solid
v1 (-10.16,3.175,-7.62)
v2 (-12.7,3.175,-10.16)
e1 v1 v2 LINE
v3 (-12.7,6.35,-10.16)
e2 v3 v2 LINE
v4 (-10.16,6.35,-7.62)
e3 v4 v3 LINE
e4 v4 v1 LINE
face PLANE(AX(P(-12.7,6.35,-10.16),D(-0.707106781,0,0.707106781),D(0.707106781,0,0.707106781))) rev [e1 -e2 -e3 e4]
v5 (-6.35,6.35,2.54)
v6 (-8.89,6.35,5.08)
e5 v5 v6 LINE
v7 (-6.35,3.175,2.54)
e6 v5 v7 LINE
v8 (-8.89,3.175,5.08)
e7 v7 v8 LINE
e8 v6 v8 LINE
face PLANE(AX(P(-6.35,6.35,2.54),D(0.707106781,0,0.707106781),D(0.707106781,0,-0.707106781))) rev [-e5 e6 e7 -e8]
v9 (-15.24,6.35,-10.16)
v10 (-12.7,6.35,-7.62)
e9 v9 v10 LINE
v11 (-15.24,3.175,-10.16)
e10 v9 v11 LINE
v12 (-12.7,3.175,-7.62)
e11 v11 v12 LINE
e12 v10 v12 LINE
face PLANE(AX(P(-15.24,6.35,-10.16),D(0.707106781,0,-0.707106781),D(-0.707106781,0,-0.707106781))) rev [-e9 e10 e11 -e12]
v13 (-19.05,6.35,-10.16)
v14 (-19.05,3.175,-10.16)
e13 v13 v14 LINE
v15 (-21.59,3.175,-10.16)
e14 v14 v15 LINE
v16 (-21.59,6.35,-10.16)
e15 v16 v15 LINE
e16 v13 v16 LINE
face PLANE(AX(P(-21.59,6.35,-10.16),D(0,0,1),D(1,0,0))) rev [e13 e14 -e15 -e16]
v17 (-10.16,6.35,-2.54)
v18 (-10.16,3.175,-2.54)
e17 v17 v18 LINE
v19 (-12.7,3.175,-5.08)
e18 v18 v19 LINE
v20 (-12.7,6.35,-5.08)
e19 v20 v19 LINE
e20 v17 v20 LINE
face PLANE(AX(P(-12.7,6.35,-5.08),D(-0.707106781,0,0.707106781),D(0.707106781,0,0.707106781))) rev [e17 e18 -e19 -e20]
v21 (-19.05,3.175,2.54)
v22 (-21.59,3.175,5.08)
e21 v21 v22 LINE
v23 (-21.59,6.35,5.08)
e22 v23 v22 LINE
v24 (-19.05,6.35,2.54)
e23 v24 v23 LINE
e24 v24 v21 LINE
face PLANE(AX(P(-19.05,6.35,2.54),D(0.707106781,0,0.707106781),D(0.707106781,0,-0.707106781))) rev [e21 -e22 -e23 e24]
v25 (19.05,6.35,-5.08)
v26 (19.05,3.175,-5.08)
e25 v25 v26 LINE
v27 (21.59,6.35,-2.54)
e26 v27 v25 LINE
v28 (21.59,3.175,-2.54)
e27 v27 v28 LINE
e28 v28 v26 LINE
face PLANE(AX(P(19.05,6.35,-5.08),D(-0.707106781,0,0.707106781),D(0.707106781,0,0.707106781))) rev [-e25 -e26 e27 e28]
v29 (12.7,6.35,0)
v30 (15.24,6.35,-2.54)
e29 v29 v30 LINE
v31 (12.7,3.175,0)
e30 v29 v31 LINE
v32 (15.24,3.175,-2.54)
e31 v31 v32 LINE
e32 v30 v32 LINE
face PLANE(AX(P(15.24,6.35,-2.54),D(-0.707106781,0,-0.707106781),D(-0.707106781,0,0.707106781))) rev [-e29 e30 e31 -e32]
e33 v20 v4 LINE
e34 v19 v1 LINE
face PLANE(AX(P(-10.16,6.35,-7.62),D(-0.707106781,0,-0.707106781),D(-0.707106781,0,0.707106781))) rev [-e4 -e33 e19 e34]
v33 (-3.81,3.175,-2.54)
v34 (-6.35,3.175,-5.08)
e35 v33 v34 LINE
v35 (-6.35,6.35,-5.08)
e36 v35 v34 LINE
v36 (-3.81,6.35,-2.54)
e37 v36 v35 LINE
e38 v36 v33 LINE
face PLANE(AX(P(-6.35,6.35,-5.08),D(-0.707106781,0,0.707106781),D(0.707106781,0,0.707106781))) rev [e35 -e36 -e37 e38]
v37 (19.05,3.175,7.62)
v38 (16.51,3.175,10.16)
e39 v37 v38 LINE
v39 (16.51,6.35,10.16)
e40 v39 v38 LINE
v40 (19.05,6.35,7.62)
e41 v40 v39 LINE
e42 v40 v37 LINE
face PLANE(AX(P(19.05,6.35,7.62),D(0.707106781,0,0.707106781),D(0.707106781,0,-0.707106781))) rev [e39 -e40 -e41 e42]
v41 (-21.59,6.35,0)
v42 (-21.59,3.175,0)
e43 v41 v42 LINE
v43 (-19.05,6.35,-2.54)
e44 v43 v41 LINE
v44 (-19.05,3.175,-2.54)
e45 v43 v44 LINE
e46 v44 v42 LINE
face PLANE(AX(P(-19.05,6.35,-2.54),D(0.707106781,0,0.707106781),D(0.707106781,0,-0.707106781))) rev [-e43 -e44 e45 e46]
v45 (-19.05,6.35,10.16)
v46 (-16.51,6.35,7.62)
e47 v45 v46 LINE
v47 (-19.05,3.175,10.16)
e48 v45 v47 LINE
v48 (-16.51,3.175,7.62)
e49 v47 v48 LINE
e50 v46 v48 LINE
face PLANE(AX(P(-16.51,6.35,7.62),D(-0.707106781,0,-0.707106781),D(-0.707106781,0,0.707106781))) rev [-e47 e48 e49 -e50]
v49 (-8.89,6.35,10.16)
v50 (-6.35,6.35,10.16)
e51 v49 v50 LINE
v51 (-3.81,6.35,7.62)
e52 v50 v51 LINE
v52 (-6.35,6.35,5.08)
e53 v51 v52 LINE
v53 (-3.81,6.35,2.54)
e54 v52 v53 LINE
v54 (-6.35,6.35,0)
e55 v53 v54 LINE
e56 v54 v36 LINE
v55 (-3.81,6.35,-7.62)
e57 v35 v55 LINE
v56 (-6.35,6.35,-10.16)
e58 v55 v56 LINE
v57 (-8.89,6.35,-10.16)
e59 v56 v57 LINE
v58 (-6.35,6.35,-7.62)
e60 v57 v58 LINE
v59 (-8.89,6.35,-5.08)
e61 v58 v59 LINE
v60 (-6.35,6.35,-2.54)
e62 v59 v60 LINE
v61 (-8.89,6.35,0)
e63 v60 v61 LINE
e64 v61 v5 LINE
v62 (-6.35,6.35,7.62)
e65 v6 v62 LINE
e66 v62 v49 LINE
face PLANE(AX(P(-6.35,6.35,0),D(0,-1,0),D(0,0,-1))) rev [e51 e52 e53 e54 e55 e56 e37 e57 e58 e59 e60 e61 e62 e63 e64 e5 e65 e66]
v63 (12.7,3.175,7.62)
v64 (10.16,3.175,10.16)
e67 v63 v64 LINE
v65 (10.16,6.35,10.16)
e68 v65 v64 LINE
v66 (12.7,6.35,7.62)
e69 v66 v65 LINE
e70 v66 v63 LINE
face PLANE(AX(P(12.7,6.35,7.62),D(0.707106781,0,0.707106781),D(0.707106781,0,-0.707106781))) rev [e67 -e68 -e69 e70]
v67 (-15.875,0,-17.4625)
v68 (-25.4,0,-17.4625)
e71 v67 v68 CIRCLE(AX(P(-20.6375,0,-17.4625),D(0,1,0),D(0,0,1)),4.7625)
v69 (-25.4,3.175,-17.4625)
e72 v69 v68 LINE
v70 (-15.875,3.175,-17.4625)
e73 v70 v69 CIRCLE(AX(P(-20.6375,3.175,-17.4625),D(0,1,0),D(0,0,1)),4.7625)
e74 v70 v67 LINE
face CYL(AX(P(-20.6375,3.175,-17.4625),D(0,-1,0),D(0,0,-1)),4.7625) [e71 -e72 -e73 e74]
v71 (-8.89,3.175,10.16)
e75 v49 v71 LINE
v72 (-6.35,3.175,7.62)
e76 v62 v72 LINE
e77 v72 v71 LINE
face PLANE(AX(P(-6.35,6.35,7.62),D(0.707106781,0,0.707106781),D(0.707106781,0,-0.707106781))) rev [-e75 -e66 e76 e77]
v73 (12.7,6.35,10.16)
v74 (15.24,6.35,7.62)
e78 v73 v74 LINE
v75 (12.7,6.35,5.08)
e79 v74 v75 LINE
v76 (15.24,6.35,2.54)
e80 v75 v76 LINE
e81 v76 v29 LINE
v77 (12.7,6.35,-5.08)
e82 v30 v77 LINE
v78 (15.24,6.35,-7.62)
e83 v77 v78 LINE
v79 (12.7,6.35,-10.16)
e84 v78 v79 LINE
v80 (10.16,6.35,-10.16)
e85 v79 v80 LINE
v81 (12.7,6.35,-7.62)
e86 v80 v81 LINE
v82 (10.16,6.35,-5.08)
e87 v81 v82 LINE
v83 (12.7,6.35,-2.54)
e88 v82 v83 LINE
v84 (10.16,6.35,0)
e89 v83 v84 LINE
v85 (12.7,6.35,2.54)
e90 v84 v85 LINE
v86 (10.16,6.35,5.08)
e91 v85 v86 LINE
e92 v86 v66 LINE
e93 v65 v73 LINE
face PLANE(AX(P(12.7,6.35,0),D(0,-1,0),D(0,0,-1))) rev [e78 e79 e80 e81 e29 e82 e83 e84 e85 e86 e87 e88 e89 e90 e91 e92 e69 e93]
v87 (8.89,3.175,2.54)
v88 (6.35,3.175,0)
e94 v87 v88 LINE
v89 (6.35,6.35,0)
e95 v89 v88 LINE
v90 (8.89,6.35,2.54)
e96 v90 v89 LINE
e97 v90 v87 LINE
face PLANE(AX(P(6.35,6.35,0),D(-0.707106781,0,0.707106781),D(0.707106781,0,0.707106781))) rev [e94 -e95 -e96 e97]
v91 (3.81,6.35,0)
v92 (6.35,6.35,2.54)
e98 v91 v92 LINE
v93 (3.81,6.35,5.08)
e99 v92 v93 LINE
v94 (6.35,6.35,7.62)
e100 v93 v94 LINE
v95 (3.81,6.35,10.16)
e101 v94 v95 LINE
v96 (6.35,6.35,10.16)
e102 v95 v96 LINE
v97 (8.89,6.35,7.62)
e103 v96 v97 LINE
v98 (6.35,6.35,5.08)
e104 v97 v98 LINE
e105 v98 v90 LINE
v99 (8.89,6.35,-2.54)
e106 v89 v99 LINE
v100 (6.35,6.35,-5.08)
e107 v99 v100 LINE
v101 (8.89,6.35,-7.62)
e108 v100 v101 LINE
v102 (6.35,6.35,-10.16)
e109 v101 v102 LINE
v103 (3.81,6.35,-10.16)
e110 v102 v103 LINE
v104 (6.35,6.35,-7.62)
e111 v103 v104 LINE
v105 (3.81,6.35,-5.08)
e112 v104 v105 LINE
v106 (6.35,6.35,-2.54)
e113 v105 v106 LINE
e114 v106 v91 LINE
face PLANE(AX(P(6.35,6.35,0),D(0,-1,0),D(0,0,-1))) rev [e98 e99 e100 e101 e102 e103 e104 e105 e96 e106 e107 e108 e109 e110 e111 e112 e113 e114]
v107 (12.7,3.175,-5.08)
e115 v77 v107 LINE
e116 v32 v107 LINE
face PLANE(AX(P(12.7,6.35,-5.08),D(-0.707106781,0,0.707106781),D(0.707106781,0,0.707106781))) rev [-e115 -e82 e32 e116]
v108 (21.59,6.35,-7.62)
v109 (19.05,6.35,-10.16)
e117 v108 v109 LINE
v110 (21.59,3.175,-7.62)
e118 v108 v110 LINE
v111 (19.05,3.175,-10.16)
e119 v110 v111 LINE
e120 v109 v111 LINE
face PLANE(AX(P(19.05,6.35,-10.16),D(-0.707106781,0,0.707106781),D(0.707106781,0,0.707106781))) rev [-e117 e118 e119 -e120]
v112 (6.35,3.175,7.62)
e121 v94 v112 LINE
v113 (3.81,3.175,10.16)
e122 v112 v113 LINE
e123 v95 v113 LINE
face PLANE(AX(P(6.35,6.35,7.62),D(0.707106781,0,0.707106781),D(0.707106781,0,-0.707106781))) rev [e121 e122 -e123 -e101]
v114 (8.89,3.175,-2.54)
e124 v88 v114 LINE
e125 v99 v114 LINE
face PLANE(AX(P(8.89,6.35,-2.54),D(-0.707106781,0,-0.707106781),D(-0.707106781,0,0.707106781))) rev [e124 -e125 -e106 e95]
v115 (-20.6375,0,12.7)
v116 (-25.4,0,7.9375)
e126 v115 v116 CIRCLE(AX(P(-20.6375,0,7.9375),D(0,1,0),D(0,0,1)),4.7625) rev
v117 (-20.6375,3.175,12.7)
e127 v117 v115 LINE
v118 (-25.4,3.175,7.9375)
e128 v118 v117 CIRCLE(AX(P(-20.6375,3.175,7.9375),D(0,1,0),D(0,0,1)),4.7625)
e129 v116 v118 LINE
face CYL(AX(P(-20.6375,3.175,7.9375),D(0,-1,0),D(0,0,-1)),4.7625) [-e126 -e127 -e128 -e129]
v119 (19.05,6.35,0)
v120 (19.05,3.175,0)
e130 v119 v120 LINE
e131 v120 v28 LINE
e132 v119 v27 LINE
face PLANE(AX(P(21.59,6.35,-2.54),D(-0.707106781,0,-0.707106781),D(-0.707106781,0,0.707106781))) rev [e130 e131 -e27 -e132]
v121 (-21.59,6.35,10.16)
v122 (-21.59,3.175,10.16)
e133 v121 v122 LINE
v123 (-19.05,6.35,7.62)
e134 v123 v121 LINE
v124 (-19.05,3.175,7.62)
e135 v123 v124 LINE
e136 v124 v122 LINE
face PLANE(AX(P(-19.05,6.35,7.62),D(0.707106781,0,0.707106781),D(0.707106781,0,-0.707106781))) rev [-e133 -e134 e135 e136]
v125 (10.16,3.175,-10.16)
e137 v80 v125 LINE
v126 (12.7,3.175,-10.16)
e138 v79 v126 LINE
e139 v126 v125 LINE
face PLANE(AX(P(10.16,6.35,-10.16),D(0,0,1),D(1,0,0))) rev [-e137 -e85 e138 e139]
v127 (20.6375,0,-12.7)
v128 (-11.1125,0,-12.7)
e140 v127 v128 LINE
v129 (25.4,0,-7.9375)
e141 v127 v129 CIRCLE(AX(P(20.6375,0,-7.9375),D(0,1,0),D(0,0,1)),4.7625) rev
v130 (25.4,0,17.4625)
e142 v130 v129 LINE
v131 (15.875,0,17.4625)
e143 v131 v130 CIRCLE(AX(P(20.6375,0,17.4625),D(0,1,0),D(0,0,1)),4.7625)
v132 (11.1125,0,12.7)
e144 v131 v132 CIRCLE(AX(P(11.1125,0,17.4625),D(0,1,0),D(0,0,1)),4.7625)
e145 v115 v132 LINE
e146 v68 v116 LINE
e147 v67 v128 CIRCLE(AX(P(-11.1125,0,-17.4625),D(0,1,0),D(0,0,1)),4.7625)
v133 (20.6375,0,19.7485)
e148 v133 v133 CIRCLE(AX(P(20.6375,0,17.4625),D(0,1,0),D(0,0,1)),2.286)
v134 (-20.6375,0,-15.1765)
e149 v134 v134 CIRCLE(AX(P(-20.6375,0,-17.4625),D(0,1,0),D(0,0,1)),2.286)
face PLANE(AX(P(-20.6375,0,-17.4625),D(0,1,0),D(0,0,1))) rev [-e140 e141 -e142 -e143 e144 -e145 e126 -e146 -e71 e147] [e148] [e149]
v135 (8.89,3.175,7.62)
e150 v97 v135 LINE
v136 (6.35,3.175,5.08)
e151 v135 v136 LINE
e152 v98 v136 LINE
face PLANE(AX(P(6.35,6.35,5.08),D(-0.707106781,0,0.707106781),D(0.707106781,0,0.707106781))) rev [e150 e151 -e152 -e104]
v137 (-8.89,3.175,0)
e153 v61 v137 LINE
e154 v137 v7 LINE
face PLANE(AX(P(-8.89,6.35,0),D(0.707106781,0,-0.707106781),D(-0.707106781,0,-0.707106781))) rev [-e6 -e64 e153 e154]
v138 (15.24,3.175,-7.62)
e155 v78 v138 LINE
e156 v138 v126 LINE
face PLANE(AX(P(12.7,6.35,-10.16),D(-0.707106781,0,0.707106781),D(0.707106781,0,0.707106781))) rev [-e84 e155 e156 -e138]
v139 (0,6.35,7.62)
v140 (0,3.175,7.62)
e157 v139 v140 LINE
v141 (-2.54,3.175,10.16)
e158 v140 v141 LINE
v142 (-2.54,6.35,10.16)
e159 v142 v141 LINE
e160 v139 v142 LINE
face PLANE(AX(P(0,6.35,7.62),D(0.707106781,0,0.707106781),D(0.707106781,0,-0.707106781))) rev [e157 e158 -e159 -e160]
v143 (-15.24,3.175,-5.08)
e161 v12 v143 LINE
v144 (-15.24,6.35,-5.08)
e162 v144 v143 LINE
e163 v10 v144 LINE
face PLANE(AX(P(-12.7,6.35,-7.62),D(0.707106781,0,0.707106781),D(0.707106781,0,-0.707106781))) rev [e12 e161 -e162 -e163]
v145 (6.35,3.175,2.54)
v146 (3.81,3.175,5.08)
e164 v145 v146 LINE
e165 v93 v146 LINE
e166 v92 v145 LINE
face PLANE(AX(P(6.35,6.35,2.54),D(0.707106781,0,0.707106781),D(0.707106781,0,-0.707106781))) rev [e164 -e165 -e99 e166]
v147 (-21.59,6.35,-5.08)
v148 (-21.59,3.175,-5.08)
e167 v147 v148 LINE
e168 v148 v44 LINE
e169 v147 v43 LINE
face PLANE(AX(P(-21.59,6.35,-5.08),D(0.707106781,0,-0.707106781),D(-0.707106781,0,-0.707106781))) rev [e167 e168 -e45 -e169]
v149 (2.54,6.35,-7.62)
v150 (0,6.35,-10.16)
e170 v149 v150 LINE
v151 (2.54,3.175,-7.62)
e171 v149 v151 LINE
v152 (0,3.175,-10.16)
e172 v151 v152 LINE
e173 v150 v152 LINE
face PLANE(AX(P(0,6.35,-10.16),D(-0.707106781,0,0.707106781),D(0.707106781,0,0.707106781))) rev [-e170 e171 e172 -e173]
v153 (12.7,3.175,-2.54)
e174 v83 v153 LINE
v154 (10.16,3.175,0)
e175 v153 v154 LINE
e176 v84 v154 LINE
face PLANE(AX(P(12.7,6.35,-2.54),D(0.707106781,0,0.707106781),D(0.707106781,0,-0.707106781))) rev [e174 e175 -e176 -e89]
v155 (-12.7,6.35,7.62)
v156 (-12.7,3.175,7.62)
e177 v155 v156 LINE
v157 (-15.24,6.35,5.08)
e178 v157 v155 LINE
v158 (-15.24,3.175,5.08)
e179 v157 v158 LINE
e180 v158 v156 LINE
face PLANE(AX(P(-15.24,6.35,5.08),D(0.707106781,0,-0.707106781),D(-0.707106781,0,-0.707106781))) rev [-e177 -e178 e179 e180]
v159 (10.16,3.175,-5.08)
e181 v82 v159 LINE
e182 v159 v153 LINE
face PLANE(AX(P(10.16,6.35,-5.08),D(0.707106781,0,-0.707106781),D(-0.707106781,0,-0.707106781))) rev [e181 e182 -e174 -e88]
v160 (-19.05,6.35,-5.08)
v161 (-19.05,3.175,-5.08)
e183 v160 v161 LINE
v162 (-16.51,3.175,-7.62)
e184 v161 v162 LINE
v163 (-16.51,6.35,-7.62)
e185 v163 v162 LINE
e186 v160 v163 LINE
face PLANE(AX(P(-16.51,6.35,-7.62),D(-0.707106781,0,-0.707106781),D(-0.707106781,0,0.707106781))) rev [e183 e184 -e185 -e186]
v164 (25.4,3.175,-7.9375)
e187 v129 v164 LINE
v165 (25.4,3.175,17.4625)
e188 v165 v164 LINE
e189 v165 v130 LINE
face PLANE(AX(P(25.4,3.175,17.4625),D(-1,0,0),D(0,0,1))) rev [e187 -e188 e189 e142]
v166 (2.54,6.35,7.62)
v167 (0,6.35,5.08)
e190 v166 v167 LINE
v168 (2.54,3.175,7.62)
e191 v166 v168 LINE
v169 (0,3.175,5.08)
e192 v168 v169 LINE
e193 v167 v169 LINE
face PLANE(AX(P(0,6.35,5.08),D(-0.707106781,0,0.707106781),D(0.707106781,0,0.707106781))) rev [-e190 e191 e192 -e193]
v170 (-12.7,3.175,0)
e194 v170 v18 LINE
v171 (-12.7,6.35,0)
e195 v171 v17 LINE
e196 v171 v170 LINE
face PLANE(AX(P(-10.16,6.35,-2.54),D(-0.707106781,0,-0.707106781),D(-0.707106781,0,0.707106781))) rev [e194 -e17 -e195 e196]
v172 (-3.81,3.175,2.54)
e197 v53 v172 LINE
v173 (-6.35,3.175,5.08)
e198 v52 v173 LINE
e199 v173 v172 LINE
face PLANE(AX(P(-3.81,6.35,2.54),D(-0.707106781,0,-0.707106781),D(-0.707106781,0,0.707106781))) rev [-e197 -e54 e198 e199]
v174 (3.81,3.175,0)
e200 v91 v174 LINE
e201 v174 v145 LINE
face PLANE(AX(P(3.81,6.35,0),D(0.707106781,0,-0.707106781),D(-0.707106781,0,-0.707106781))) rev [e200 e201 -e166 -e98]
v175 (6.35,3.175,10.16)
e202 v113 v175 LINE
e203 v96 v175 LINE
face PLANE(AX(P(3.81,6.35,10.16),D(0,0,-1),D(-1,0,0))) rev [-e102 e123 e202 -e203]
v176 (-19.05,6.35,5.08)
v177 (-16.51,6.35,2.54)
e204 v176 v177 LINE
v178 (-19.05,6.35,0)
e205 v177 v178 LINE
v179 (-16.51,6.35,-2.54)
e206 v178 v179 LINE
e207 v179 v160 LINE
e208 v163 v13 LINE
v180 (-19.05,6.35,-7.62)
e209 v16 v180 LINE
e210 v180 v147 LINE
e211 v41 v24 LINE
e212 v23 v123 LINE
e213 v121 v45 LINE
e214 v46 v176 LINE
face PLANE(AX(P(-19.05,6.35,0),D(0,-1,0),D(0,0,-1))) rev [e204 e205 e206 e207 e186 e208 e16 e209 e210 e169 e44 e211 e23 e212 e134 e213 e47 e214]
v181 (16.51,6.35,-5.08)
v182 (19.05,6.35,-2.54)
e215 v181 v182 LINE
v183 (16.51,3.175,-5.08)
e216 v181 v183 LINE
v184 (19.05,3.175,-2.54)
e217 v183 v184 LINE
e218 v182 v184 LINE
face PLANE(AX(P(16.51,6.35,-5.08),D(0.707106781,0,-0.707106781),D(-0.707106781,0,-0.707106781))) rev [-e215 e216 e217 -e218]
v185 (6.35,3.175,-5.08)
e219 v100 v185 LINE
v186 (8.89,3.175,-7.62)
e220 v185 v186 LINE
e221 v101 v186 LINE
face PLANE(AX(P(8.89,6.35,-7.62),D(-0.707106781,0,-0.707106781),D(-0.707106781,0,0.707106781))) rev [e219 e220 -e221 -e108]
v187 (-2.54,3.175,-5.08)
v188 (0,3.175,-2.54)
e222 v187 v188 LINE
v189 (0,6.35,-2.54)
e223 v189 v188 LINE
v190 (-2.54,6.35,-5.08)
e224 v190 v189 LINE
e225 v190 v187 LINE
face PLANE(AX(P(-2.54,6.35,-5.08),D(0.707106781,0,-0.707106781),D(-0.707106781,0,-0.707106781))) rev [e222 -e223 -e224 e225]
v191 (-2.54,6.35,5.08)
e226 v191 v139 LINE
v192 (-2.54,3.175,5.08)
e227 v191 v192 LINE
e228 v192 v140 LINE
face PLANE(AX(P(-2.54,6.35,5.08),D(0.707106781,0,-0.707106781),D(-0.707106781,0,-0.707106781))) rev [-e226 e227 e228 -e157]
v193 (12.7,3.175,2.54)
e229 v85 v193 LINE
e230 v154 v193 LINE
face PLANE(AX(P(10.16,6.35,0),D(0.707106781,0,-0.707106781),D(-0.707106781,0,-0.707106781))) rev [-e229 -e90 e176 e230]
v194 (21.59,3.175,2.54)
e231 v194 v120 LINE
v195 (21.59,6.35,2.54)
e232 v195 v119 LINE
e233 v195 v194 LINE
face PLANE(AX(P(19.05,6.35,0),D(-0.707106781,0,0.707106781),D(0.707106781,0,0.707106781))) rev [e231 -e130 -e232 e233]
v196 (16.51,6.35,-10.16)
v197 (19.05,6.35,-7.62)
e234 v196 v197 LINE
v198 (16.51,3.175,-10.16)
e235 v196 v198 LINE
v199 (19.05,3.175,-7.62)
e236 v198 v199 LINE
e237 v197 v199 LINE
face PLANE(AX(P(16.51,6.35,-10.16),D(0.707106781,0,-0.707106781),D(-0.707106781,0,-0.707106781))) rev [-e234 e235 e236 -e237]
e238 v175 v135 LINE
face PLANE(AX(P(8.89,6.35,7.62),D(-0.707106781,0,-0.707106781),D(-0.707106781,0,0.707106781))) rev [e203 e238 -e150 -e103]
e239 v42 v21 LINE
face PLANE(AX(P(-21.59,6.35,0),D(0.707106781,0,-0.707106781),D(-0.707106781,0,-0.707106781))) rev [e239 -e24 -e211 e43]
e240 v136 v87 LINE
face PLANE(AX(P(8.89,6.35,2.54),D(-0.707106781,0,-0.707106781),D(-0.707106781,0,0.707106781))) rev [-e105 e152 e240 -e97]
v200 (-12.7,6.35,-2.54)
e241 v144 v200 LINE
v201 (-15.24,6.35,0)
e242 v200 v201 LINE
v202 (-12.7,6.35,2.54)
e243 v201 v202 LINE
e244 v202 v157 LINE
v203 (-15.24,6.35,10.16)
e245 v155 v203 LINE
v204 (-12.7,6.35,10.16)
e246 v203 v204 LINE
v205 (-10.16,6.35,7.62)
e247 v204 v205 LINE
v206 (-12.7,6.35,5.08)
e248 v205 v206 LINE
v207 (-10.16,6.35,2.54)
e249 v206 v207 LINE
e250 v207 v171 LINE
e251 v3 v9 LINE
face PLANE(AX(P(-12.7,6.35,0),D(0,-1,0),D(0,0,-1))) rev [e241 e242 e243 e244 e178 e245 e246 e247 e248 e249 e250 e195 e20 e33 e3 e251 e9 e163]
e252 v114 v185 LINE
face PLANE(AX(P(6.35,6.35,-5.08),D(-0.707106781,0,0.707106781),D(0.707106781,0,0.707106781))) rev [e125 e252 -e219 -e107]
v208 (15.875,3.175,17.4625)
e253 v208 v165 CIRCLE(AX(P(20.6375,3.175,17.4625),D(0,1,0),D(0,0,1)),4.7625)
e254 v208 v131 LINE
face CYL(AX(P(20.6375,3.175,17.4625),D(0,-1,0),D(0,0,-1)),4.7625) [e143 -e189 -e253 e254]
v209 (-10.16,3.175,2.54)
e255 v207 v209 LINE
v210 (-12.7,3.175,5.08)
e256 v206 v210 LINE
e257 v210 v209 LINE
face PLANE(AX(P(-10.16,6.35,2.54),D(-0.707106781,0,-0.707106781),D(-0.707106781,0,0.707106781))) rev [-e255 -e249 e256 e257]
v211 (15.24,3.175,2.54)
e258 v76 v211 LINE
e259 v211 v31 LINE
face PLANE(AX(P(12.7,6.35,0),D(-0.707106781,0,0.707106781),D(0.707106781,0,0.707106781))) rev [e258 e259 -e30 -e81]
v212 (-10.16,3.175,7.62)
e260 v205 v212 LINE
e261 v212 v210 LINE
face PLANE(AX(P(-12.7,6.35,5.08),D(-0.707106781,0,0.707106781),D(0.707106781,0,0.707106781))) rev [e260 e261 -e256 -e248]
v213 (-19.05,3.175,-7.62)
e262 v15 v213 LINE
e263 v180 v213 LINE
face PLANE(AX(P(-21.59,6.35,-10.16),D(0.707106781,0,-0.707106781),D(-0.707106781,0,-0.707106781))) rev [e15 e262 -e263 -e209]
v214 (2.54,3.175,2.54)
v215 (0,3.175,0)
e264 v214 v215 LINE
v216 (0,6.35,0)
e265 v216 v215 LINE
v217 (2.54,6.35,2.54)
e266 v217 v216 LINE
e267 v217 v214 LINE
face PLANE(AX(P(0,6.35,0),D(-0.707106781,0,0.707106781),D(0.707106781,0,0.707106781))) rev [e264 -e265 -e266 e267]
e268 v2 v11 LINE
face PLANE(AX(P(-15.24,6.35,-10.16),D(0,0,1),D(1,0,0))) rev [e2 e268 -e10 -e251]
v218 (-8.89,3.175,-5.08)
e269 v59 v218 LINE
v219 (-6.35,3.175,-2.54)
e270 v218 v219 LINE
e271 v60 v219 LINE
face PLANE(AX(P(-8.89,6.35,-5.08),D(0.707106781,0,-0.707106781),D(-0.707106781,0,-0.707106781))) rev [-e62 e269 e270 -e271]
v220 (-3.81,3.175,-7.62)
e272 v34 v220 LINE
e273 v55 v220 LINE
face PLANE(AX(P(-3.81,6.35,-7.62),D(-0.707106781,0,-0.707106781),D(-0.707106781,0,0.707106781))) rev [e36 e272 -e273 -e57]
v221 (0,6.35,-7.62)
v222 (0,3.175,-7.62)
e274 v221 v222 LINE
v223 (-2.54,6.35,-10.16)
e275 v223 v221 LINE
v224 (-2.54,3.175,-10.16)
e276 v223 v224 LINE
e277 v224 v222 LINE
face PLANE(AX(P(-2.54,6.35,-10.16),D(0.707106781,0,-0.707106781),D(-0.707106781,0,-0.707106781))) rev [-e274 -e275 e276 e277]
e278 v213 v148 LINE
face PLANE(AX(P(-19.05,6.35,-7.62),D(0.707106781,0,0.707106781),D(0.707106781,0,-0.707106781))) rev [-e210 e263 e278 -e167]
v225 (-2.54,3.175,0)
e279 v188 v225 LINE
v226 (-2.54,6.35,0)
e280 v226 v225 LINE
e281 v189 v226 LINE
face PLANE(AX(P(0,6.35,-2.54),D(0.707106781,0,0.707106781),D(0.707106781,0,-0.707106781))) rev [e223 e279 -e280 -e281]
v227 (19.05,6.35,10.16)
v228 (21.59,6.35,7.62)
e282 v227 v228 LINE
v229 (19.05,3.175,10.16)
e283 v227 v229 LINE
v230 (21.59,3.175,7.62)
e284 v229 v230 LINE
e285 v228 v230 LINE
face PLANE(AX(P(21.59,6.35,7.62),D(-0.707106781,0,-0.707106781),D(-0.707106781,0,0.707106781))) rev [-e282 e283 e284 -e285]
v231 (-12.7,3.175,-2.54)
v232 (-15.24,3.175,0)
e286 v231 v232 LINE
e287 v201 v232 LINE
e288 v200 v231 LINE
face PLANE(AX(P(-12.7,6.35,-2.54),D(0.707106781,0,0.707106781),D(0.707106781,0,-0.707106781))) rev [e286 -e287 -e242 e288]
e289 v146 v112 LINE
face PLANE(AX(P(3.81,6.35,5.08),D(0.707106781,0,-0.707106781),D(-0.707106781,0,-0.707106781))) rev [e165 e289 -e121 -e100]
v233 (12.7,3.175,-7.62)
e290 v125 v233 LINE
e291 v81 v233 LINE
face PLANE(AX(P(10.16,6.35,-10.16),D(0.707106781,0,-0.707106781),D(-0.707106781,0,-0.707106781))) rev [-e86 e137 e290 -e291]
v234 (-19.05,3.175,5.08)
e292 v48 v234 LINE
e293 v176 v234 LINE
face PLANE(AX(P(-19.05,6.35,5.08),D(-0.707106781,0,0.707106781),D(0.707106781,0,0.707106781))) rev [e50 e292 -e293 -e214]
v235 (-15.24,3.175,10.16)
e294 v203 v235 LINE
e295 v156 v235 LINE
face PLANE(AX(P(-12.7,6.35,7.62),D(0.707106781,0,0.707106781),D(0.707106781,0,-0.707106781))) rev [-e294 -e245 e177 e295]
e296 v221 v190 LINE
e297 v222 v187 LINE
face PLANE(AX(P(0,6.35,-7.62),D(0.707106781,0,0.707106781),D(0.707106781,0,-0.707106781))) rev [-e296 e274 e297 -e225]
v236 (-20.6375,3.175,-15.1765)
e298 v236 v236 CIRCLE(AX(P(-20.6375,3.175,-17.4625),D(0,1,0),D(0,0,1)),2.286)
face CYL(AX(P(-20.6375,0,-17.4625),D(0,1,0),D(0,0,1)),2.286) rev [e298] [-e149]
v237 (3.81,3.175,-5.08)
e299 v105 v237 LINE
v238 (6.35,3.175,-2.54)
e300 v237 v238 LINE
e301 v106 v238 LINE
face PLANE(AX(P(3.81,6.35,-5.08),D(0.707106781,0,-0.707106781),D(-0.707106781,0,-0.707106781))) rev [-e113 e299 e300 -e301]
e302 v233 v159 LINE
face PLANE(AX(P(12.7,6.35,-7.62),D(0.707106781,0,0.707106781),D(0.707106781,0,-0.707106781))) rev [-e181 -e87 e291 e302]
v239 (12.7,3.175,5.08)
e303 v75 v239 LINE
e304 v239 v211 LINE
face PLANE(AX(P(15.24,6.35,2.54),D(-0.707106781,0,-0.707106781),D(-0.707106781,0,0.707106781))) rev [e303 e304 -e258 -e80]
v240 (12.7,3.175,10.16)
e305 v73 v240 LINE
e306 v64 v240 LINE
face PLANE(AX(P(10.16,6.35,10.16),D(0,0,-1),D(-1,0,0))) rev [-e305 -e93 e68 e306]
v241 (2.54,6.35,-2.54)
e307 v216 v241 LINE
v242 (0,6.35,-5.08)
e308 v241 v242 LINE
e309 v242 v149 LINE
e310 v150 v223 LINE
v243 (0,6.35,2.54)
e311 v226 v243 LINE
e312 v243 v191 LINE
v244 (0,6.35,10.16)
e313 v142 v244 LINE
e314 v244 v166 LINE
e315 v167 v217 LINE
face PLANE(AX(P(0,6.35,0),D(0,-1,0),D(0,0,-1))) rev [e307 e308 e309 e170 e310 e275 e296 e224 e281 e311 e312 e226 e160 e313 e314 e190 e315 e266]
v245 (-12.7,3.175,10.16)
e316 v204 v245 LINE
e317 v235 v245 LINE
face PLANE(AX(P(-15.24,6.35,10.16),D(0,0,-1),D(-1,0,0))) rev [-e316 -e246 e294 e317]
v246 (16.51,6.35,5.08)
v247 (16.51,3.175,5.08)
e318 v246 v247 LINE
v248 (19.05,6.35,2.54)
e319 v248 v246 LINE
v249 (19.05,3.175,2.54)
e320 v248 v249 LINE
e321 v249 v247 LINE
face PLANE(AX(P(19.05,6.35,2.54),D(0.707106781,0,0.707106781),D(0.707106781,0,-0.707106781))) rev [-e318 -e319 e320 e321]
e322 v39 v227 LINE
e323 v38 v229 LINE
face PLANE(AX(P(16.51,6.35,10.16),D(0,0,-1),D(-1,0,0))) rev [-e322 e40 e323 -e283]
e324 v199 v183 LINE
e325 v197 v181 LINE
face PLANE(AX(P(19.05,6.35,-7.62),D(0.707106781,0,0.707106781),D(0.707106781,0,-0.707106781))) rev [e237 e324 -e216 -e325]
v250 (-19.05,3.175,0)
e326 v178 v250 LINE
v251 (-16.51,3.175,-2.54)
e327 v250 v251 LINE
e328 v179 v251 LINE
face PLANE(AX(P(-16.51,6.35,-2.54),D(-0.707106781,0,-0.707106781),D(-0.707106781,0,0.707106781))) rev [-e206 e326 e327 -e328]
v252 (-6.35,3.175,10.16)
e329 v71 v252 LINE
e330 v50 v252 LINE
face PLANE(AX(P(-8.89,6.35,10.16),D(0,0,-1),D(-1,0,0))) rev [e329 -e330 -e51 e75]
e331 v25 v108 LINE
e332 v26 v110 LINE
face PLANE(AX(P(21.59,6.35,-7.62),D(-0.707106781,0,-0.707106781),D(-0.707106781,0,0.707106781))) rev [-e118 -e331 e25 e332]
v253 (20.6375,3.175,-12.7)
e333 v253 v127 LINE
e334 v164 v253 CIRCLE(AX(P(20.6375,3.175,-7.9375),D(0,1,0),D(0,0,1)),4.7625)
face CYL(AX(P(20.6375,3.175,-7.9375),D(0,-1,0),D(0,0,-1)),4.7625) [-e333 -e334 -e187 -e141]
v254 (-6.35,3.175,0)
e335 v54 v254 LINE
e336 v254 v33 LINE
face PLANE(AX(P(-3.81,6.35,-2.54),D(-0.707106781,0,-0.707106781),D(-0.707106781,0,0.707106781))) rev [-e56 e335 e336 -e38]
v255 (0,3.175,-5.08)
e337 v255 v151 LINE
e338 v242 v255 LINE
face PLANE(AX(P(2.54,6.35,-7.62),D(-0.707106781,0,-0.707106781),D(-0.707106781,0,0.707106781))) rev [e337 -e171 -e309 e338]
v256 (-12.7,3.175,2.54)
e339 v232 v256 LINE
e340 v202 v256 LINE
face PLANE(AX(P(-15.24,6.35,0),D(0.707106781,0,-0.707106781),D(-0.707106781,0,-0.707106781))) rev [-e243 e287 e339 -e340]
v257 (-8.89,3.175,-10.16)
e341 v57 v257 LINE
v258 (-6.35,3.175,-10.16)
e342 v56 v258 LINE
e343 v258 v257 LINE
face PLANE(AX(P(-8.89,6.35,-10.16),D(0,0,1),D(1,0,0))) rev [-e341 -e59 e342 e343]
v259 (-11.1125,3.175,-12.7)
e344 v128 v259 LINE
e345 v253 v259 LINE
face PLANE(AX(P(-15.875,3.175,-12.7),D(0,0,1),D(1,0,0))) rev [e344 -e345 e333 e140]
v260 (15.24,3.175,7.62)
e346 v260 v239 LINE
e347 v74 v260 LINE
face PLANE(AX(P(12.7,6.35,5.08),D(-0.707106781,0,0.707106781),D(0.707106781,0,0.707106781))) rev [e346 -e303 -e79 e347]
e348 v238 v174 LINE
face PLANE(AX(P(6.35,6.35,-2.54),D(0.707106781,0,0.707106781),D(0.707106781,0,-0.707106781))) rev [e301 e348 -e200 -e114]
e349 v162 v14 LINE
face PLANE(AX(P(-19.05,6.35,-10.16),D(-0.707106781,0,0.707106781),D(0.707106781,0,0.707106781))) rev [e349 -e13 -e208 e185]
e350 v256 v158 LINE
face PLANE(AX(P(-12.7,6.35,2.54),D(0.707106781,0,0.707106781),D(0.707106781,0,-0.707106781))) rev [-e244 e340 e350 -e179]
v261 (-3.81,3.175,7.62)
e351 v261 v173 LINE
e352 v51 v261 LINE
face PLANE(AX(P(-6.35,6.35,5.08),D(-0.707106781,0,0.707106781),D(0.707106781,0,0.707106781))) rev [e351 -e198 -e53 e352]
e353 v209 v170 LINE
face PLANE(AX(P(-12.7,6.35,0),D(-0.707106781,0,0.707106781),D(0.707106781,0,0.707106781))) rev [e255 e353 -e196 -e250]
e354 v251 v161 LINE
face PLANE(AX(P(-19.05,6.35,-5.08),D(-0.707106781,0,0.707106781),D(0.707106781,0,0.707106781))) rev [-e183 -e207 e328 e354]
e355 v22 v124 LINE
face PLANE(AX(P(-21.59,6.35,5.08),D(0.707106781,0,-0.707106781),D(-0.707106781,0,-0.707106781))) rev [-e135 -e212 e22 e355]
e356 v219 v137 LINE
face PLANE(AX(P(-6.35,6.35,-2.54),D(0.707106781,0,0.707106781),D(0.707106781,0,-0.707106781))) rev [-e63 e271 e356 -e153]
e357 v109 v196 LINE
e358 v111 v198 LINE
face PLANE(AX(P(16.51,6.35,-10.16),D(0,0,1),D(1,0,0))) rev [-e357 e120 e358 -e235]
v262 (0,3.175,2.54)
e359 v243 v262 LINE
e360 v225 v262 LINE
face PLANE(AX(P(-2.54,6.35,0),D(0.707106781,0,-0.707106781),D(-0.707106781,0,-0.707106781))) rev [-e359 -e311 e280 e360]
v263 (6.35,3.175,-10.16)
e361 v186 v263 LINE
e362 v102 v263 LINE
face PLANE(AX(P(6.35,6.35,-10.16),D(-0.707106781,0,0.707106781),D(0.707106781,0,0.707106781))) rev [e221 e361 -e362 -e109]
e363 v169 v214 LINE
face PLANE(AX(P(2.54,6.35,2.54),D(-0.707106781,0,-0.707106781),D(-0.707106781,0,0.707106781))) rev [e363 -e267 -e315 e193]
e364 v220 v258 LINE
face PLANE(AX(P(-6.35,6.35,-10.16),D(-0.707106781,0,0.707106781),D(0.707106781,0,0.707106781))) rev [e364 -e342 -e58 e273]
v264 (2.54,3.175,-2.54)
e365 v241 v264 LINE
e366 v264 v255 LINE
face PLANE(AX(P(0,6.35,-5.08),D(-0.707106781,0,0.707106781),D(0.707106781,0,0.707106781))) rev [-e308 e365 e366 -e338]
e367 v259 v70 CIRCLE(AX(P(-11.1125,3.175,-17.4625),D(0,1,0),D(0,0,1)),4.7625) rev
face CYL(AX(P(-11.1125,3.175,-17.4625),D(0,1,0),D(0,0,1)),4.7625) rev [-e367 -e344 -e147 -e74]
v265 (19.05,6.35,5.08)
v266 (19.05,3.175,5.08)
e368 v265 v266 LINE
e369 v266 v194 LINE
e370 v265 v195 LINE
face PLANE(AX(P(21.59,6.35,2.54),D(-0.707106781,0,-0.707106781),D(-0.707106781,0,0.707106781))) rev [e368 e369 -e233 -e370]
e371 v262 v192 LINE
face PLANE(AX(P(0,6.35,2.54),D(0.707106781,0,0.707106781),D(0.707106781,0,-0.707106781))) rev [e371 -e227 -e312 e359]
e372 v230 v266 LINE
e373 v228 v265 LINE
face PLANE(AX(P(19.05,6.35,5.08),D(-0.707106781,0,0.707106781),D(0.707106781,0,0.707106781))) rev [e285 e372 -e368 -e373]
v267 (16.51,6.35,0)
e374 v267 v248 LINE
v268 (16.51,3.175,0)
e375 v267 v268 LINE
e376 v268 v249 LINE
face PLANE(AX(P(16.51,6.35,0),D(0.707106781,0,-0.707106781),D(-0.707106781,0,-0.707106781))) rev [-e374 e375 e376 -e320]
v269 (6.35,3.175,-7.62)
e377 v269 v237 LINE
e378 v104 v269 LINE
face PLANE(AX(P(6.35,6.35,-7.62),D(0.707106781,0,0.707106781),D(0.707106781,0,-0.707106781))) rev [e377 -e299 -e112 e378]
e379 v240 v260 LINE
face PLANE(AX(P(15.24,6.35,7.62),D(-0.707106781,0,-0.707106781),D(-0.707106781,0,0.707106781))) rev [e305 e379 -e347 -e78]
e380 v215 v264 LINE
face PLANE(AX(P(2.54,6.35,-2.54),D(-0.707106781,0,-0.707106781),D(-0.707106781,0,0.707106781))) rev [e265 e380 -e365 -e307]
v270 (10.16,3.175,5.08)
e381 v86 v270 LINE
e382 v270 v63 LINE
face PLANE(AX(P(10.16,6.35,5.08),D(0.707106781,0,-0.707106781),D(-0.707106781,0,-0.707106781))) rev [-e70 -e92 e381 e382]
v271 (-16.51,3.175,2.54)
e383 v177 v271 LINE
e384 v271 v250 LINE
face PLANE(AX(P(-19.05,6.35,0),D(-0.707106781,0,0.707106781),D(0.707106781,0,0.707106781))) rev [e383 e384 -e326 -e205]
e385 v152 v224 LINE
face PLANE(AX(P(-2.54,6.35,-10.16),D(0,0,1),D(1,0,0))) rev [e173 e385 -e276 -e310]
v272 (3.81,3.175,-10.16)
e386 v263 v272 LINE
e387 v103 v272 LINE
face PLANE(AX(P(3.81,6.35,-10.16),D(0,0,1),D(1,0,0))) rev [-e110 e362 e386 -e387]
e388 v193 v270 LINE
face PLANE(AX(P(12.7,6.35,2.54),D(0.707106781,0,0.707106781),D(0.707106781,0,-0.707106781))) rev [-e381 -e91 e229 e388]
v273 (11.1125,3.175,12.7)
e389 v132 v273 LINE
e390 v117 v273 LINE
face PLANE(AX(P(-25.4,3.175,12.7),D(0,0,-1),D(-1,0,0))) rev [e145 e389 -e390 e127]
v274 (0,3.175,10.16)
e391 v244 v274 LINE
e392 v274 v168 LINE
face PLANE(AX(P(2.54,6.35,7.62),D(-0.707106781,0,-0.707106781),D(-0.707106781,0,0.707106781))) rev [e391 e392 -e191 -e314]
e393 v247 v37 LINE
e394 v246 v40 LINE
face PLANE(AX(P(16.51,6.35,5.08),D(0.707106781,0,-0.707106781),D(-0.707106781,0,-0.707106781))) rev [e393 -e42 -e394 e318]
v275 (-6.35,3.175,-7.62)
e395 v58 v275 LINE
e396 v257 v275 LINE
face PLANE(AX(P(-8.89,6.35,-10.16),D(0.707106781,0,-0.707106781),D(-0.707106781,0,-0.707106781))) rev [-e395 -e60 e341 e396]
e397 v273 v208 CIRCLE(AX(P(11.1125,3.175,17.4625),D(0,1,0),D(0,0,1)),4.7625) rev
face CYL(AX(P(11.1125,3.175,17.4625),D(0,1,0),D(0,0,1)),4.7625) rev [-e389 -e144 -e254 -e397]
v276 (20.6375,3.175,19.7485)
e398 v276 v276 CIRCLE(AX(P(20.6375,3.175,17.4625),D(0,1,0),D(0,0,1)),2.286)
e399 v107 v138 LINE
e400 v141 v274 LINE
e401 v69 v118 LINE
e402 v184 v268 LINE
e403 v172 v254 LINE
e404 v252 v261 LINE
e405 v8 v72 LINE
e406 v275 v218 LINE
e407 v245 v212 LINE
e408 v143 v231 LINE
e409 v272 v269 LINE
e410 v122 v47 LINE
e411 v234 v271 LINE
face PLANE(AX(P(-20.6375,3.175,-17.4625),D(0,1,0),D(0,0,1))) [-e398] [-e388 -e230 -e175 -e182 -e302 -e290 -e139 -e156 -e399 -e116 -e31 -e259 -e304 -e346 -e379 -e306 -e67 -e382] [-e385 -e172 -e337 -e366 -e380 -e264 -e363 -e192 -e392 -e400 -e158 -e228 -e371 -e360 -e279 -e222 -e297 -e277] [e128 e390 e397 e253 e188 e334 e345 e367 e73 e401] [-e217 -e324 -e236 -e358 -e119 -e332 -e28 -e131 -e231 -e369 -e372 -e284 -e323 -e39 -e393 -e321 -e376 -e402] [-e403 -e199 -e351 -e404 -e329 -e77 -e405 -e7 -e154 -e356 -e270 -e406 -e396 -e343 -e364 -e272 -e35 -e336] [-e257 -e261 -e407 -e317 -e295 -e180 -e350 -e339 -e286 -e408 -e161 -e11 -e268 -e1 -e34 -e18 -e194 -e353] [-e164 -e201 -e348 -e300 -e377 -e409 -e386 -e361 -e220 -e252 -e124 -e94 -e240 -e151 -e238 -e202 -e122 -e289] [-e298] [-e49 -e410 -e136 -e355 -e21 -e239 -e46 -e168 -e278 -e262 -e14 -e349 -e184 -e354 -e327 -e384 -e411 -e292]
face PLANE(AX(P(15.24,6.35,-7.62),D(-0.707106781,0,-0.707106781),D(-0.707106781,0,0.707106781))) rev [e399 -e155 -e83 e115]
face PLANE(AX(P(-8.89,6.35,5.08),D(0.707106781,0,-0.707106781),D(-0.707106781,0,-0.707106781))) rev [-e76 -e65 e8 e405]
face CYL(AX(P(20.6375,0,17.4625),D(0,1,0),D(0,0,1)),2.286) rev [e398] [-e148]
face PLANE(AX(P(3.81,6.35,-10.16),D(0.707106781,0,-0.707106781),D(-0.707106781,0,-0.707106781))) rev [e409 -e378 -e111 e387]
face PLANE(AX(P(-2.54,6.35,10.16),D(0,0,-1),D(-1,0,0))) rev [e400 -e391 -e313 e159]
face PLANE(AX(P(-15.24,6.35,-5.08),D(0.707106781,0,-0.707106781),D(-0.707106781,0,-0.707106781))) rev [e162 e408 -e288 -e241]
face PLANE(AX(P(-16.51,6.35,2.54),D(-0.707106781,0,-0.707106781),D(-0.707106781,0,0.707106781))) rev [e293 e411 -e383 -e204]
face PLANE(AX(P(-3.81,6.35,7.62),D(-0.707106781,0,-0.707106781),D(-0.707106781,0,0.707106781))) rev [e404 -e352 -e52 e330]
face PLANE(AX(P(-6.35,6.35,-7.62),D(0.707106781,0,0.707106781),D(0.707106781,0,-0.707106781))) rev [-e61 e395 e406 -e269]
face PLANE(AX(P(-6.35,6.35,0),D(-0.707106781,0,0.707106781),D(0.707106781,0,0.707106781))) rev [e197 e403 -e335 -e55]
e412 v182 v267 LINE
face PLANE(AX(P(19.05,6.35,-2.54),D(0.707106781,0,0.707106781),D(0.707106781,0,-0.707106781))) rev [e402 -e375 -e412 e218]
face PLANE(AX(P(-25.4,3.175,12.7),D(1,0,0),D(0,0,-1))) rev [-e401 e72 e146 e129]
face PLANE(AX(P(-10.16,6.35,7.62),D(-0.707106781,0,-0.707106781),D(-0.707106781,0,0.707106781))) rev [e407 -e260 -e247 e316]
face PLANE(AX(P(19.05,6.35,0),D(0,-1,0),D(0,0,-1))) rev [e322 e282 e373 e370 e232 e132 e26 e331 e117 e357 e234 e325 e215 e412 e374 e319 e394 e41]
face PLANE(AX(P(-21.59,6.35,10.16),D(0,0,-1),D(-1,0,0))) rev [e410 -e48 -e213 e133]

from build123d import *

# Parameters (mm, degrees)
BOSS_EXTRUDE1_DEPTH = 3.175
SKETCH2_R           = 2.286
CUT_EXTRUDE1_DEPTH  = 34.89972345
FILLET1_START       = -1
FILLET1_DEPTH       = 5
FILLET1_2_DEPTH     = 3.175
BOSS_EXTRUDE2_DEPTH = 3.175
LPATTERN1_COUNT     = 4
LPATTERN1_PITCH     = 6.35
LPATTERN1_COL_COUNT = 4
LPATTERN1_COL_PITCH = 6.35


with BuildPart() as part:
    # Sketch1 → Boss-Extrude1 (new body)
    with BuildSketch(Plane(origin=(0, 0, 0), x_dir=(1, 0, 0), z_dir=(0, 1, 0))):
        with BuildLine():
            Line((-15.875, 12.7), (-15.875, 17.4625))
            ThreePointArc((-15.875, 17.4625), (-20.6375, 22.225), (-25.4, 17.4625))
            Line((-25.4, 17.4625), (-25.4, -12.7))
            Line((-25.4, -12.7), (15.875, -12.7))
            Line((15.875, -12.7), (15.875, -17.4625))
            ThreePointArc((15.875, -17.4625), (20.6375, -22.225), (25.4, -17.4625))
            Line((25.4, -17.4625), (25.4, 12.7))
            Line((25.4, 12.7), (-15.875, 12.7))
        make_face()
    extrude(amount=BOSS_EXTRUDE1_DEPTH)

    # Sketch2 → Cut-Extrude1 (cut, through all)
    with BuildSketch(Plane(origin=(0, 3.175, 0), x_dir=(1, 0, 0), z_dir=(0, 1, 0))):
        with Locations(Location((-20.6375, 17.4625, 0), (0, 0, 270))):
            Circle(SKETCH2_R)
        with Locations(Location((20.6375, -17.4625, 0), (0, 0, 270))):
            Circle(SKETCH2_R)
    extrude(amount=-CUT_EXTRUDE1_DEPTH, mode=Mode.SUBTRACT)

    # Fillet1: read off the stored shape, not the designer's step
    # Fillet1 outline → Fillet1 (cut)
    with BuildSketch(Plane(origin=(0, 0, 0), x_dir=(1, 0, 0), z_dir=(0, 1, 0)).offset(FILLET1_START)):
        with BuildLine():
            Line((25.4, 12.7), (20.6375, 12.7))
            ThreePointArc((20.6375, 12.7), (24.005096045, 11.305096045), (25.4, 7.9375))
            Line((25.4, 7.9375), (25.4, 12.7))
        make_face()
        with BuildLine():
            Line((-25.4, -12.7), (-20.6375, -12.7))
            ThreePointArc((-20.6375, -12.7), (-24.005096045, -11.305096045), (-25.4, -7.9375))
            Line((-25.4, -7.9375), (-25.4, -12.7))
        make_face()
    extrude(amount=FILLET1_DEPTH, mode=Mode.SUBTRACT)

    # Fillet1 2 outline → Fillet1 2 (add)
    with BuildSketch(Plane(origin=(0, 0, 0), x_dir=(1, 0, 0), z_dir=(0, 1, 0))):
        with BuildLine():
            Line((-15.875, 12.7), (-11.1125, 12.7))
            ThreePointArc((-11.1125, 12.7), (-14.480096045, 14.094903955), (-15.875, 17.4625))
            Line((-15.875, 17.4625), (-15.875, 12.7))
        make_face()
        with BuildLine():
            Line((15.875, -12.7), (11.1125, -12.7))
            ThreePointArc((11.1125, -12.7), (14.480096045, -14.094903955), (15.875, -17.4625))
            Line((15.875, -17.4625), (15.875, -12.7))
        make_face()
    extrude(amount=FILLET1_2_DEPTH)

    # Sketch3 → Boss-Extrude2 (add)
    with BuildSketch(Plane(origin=(0, 3.175, 0), x_dir=(1, 0, 0), z_dir=(0, 1, 0))):
        Polygon((0, 10.16), (2.54, 7.62), (0, 5.08), (2.54, 2.54), (0, 0), (2.54, -2.54), (0, -5.08), (2.54, -7.62), (0, -10.16), (-2.54, -10.16), (0, -7.62), (-2.54, -5.08), (0, -2.54), (-2.54, 0), (0, 2.54), (-2.54, 5.08), (0, 7.62), (-2.54, 10.16), align=None)
    boss_extrude2 = extrude(amount=BOSS_EXTRUDE2_DEPTH)

    # LPattern1: Boss-Extrude2 ×4
    with Locations(*[(-i * LPATTERN1_PITCH, 0, 0) for i in range(1, LPATTERN1_COUNT)]):
        add(boss_extrude2)

    # LPattern1 col: Boss-Extrude2 ×4
    with Locations(*[(i * LPATTERN1_COL_PITCH, 0, 0) for i in range(1, LPATTERN1_COL_COUNT)]):
        add(boss_extrude2)


solid = part.part
